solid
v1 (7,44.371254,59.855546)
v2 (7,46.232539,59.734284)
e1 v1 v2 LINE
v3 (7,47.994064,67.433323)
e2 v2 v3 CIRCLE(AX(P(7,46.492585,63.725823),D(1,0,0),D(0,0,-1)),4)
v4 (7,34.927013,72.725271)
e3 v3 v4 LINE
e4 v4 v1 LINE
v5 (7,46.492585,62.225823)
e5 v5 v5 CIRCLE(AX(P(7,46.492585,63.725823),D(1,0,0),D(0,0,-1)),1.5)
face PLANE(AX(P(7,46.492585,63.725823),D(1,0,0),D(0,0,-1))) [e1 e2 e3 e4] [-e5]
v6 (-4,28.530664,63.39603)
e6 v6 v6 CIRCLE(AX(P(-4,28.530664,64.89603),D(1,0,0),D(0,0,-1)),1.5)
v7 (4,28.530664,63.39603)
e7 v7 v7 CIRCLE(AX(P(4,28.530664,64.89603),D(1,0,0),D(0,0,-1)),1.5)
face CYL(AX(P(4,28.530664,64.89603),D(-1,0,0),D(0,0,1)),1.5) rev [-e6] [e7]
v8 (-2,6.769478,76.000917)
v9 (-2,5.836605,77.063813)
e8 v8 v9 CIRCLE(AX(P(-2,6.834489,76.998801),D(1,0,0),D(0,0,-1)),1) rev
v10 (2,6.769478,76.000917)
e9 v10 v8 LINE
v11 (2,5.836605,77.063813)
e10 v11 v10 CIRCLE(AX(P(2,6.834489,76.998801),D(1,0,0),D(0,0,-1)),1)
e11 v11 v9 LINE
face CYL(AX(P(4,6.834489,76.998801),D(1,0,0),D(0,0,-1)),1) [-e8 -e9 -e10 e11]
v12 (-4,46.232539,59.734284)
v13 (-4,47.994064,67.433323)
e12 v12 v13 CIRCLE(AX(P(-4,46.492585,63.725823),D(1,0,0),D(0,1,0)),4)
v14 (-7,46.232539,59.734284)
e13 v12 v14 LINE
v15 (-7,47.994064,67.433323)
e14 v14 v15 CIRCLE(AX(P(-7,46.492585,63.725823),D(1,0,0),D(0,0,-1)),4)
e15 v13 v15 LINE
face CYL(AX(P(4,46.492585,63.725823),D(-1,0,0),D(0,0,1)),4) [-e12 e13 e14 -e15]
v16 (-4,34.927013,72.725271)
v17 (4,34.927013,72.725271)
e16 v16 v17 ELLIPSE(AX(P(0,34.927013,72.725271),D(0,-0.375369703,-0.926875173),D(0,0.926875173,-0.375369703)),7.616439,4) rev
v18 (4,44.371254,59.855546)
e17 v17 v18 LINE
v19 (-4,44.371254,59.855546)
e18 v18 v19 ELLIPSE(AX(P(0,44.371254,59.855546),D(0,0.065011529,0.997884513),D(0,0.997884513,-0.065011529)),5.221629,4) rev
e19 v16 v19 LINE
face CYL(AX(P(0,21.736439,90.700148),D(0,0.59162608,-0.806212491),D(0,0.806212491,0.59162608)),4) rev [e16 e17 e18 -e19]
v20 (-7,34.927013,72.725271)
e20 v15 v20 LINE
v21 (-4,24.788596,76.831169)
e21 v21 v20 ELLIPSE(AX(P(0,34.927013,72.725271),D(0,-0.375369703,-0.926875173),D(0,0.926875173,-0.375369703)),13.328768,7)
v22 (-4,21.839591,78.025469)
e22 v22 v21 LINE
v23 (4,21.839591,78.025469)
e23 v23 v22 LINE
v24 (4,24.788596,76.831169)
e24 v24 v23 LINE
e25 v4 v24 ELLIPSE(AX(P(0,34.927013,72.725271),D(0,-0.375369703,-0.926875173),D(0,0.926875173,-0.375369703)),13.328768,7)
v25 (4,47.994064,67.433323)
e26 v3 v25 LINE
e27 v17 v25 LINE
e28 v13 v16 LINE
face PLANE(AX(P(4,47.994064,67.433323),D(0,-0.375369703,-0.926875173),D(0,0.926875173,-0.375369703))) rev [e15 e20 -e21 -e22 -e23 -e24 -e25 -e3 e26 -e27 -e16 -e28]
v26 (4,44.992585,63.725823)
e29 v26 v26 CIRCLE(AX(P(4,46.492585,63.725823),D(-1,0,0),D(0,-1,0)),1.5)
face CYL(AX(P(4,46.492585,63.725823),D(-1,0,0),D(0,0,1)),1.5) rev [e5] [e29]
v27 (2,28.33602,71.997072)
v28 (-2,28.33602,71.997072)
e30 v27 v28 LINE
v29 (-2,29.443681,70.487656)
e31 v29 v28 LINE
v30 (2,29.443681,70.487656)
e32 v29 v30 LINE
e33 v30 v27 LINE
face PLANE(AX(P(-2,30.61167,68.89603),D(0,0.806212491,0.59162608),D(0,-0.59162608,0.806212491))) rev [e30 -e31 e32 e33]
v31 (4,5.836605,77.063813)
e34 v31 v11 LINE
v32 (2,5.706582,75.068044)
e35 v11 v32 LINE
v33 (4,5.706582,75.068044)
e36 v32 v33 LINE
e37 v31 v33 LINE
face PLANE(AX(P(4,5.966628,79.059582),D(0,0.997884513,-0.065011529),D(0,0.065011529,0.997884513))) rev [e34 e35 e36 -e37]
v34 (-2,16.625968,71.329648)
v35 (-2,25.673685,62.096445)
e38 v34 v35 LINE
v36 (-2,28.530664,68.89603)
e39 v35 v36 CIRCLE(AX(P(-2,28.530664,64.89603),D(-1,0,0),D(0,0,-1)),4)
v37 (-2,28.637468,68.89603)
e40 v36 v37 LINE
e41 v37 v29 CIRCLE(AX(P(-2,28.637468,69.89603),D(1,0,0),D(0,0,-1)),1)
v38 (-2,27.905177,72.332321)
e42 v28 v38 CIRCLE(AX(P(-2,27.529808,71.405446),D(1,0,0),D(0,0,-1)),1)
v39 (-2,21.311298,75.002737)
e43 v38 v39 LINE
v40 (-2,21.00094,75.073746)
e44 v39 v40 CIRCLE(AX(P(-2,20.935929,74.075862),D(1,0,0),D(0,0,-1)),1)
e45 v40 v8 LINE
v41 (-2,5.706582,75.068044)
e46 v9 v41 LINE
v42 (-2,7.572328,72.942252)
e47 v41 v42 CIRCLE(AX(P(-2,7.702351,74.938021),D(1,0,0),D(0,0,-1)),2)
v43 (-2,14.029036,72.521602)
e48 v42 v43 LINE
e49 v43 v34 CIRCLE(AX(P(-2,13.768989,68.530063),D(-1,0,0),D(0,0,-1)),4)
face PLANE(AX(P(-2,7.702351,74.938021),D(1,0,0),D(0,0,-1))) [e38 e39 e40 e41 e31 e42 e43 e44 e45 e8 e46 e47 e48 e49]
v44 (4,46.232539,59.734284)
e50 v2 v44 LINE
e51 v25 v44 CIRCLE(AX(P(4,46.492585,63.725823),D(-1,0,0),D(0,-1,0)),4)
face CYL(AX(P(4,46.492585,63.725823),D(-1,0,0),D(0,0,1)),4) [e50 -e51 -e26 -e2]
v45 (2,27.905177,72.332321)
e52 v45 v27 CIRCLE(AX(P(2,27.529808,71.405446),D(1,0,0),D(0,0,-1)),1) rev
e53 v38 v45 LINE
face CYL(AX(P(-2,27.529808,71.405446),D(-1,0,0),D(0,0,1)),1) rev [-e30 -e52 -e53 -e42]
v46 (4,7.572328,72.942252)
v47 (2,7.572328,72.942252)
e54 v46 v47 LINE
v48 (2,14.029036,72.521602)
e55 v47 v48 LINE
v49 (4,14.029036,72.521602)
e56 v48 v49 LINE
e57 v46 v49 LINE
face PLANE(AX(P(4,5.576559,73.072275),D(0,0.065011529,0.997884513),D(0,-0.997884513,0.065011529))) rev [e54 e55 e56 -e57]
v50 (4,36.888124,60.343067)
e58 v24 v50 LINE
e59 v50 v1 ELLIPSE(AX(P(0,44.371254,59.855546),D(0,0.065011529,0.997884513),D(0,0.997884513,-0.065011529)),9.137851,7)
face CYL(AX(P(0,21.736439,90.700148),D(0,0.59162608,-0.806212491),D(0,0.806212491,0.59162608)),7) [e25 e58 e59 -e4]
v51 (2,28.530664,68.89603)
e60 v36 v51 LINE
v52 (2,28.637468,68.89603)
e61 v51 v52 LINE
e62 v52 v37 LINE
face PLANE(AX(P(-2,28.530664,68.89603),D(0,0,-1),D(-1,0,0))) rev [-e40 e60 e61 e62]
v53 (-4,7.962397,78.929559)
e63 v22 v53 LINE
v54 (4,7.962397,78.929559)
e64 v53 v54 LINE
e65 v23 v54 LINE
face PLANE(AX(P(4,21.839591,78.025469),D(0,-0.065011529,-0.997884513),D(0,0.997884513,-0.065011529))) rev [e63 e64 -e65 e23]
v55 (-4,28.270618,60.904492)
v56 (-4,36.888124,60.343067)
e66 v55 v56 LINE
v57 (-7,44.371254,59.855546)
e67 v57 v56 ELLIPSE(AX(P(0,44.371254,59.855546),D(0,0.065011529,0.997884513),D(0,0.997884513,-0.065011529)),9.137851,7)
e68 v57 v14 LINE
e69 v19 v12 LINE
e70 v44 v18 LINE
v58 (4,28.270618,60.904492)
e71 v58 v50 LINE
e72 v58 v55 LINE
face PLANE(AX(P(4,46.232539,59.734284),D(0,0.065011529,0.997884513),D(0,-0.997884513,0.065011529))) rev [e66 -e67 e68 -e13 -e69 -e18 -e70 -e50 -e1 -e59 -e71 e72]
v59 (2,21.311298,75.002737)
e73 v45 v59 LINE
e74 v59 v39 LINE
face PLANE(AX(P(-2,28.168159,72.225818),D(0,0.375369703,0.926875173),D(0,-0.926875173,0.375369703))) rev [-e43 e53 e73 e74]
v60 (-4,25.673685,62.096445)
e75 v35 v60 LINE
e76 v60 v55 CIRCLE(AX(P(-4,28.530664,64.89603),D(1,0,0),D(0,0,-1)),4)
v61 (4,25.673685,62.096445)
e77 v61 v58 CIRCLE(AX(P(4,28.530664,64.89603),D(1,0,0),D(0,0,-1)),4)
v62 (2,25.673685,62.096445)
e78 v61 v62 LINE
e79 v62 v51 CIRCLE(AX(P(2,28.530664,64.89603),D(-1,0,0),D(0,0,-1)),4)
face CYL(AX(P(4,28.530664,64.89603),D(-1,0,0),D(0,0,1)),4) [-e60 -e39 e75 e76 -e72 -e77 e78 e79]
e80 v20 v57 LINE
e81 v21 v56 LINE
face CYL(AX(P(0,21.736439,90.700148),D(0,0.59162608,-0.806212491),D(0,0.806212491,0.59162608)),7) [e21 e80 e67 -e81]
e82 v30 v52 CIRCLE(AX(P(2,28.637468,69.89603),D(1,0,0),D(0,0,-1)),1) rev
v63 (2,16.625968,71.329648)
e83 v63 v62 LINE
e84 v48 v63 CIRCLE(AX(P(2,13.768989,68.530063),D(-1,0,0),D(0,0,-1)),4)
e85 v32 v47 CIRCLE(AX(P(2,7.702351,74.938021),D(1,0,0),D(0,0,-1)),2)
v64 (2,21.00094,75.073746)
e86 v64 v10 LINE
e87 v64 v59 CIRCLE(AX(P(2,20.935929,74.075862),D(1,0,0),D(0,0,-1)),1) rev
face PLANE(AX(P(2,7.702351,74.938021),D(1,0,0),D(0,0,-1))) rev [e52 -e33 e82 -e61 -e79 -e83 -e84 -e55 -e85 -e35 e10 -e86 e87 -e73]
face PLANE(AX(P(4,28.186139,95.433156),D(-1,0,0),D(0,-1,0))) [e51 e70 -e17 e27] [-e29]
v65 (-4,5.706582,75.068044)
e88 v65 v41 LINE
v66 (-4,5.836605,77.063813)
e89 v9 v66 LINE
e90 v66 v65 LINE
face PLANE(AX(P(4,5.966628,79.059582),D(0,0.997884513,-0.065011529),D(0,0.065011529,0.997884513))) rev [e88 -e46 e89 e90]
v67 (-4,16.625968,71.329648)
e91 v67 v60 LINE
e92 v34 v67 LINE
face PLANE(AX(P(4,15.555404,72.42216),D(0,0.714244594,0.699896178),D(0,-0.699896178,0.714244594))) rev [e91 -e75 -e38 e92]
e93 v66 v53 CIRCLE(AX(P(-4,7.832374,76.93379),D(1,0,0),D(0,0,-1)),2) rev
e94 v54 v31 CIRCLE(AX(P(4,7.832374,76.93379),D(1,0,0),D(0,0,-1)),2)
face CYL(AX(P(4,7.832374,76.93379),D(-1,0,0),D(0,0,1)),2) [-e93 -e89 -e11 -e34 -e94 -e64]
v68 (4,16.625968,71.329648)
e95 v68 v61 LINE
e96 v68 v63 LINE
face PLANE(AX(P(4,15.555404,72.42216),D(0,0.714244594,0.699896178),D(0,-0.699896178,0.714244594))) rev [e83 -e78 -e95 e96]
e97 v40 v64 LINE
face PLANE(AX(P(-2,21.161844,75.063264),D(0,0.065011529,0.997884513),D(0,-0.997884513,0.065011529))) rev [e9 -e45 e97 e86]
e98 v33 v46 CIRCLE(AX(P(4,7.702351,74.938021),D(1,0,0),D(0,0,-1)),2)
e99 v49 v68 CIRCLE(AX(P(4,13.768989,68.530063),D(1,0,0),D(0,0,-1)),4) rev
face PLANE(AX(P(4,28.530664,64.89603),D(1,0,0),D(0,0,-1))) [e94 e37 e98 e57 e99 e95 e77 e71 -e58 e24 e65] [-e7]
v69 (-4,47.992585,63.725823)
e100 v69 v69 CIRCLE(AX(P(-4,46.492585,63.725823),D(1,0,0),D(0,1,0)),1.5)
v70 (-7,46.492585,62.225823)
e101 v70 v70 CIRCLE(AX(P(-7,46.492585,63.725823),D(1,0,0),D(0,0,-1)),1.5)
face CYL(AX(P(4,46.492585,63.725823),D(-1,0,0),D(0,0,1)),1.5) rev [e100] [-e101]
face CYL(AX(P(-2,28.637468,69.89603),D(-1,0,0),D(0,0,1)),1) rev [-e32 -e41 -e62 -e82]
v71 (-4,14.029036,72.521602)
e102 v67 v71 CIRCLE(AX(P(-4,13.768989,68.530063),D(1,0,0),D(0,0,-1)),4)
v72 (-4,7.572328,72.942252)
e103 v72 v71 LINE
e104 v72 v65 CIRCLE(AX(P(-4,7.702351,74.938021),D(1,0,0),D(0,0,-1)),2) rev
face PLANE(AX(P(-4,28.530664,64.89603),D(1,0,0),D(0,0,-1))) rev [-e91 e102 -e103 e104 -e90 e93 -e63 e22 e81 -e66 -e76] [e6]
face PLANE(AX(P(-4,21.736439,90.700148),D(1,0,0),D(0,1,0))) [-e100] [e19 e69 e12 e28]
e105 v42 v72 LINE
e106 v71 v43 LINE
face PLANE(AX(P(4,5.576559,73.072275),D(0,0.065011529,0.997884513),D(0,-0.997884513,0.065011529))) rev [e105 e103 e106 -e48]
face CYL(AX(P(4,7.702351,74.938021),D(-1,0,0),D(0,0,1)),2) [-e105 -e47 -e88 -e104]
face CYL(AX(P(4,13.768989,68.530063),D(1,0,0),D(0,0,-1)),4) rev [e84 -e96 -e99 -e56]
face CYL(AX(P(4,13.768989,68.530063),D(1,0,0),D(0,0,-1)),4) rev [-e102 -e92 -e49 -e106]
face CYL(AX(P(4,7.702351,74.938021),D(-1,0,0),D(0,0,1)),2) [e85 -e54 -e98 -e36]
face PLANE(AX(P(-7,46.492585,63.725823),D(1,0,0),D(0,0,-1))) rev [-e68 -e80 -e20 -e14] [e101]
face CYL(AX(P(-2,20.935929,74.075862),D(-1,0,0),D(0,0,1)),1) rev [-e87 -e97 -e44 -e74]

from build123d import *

# Parameters (mm, degrees)
SKETCH_1_R               = 1.5
EXTRUDE_1_DEPTH          = 4
FILLET_1_R               = 2
FILLET_2_R               = 4
SKETCH_2_R               = 1.5
EXTRUDE_2_DEPTH          = 7
CUT_EXTRUDE_1_DEPTH      = 75.524894896
CUT_EXTRUDE_1_DEPTH_BACK = 75.524894896
CUT_EXTRUDE_2_DEPTH      = 2
FILLET_3_R               = 1


with BuildPart() as part:
    # 草图1 → 凸台-拉伸1 (new, symmetric)
    with BuildSketch(Plane(origin=(0, 0, 0), x_dir=(0, 0, -1), z_dir=(1, 0, 0))):
        with BuildLine():
            Line((-59.734284448, 46.23253896), (-60.904491974, 28.270617728))
            ThreePointArc((-60.904491974, 28.270617728), (-61.260668779, 26.862087023), (-62.096445312, 25.67368547))
            Line((-62.096445312, 25.67368547), (-72.42215962, 15.555403796))
            Line((-72.42215962, 15.555403796), (-73.072274912, 5.576558667))
            Line((-73.072274912, 5.576558667), (-79.059581989, 5.966627842))
            Line((-79.059581989, 5.966627842), (-78.025468729, 21.839590984))
            Line((-78.025468729, 21.839590984), (-67.433323191, 47.994063888))
            ThreePointArc((-67.433323191, 47.994063888), (-62.833683596, 50.391827077), (-59.734284448, 46.23253896))
        make_face()
        with Locations((-64.896030026, 28.530663844)):
            Circle(SKETCH_1_R, mode=Mode.SUBTRACT)
        with Locations((-63.7258225, 46.492585076)):
            Circle(SKETCH_1_R, mode=Mode.SUBTRACT)
    extrude(amount=EXTRUDE_1_DEPTH, both=True)

    # 圆角1
    fillet_1_edges = [part.edges().sort_by_distance(p)[0] for p in [
        (0, 5.576558667, 73.072274912),
        (0, 5.966627842, 79.059581989),
    ]]
    fillet(fillet_1_edges, radius=FILLET_1_R)

    # 圆角2
    fillet_2_edges = [part.edges().sort_by_distance(p)[0] for p in [
        (0, 15.555403796, 72.42215962),
    ]]
    fillet(fillet_2_edges, radius=FILLET_2_R)

    # 草图2 → 凸台-拉伸2 (add, symmetric)
    with BuildSketch(Plane(origin=(0, 0, 0), x_dir=(0, 0, -1), z_dir=(1, 0, 0))):
        with BuildLine():
            Line((-60.534478137, 33.950088462), (-59.734284448, 46.23253896))
            ThreePointArc((-59.734284448, 46.23253896), (-62.833683596, 50.391827077), (-67.433323191, 47.994063888))
            Line((-67.433323191, 47.994063888), (-78.025468729, 21.839590984))
            Line((-78.025468729, 21.839590984), (-78.075072521, 21.07820517))
            Line((-78.075072521, 21.07820517), (-60.534478137, 33.950088462))
        make_face()
        with Locations((-63.7258225, 46.492585076)):
            Circle(SKETCH_2_R, mode=Mode.SUBTRACT)
    extrude(amount=EXTRUDE_2_DEPTH, both=True)

    # 草图3 → 切除-拉伸1 (cut, two sides: drawn at the far end of the back side and taken through both)
    with BuildSketch(Plane(origin=(0, 76.493888819, 81.941089709), x_dir=(-1, 0, 0), z_dir=(0, -0.5916260801069638, 0.8062124914296904)).offset(-CUT_EXTRUDE_1_DEPTH_BACK)):
        with BuildLine():
            Line((4, 38.964052974), (4, 30.964052974))
            Line((4, 30.964052974), (-4, 30.964052974))
            Line((-4, 30.964052974), (-4, 38.964052974))
            ThreePointArc((-4, 38.964052974), (0, 42.964052974), (4, 38.964052974))
        make_face()
        with BuildLine():
            Line((7, 38.964052974), (7, 53.964052974))
            Line((7, 53.964052974), (4, 53.964052974))
            Line((4, 53.964052974), (4, 44.70861562))
            ThreePointArc((4, 44.70861562), (6.204836823, 42.204423323), (7, 38.964052974))
        make_face()
        with BuildLine():
            Line((-4, 53.964052974), (-4, 44.70861562))
            ThreePointArc((-4, 44.70861562), (-6.204836823, 42.204423323), (-7, 38.964052974))
            Line((-7, 38.964052974), (-7, 53.964052974))
            Line((-7, 53.964052974), (-4, 53.964052974))
        make_face()
    extrude(amount=CUT_EXTRUDE_1_DEPTH + CUT_EXTRUDE_1_DEPTH_BACK, mode=Mode.SUBTRACT)

    # 草图4 → 切除-拉伸2 (cut, symmetric)
    with BuildSketch(Plane(origin=(0, 0, 0), x_dir=(0, 0, -1), z_dir=(1, 0, 0))):
        with BuildLine():
            Line((-68.896030026, 28.530663844), (-68.896030026, 30.611669816))
            Line((-68.896030026, 30.611669816), (-72.22581768, 28.168158659))
            Line((-72.22581768, 28.168158659), (-75.063263573, 21.161844268))
            Line((-75.063263573, 21.161844268), (-76.06592845, 5.771593254))
            Line((-76.06592845, 5.771593254), (-75.068043938, 5.706581725))
            ThreePointArc((-75.068043938, 5.706581725), (-73.618739254, 6.199188753), (-72.942251853, 7.572327692))
            Line((-72.942251853, 7.572327692), (-72.52160152, 14.029035582))
            ThreePointArc((-72.52160152, 14.029035582), (-72.165424714, 15.437566287), (-71.329648181, 16.62596784))
            Line((-71.329648181, 16.62596784), (-62.096445312, 25.67368547))
            ThreePointArc((-62.096445312, 25.67368547), (-66.445491407, 24.842958673), (-68.896030026, 28.530663844))
        make_face()
    extrude(amount=CUT_EXTRUDE_2_DEPTH, both=True, mode=Mode.SUBTRACT)

    # 圆角3
    fillet_3_edges = [part.edges().sort_by_distance(p)[0] for p in [
        (0, 28.168158659, 72.22581768),
        (0, 30.611669816, 68.896030026),
        (0, 5.771593254, 76.06592845),
        (0, 21.161844268, 75.063263573),
    ]]
    fillet(fillet_3_edges, radius=FILLET_3_R - 0.0001)  # a hair under: the kernel refuses the full size


solid = part.part
